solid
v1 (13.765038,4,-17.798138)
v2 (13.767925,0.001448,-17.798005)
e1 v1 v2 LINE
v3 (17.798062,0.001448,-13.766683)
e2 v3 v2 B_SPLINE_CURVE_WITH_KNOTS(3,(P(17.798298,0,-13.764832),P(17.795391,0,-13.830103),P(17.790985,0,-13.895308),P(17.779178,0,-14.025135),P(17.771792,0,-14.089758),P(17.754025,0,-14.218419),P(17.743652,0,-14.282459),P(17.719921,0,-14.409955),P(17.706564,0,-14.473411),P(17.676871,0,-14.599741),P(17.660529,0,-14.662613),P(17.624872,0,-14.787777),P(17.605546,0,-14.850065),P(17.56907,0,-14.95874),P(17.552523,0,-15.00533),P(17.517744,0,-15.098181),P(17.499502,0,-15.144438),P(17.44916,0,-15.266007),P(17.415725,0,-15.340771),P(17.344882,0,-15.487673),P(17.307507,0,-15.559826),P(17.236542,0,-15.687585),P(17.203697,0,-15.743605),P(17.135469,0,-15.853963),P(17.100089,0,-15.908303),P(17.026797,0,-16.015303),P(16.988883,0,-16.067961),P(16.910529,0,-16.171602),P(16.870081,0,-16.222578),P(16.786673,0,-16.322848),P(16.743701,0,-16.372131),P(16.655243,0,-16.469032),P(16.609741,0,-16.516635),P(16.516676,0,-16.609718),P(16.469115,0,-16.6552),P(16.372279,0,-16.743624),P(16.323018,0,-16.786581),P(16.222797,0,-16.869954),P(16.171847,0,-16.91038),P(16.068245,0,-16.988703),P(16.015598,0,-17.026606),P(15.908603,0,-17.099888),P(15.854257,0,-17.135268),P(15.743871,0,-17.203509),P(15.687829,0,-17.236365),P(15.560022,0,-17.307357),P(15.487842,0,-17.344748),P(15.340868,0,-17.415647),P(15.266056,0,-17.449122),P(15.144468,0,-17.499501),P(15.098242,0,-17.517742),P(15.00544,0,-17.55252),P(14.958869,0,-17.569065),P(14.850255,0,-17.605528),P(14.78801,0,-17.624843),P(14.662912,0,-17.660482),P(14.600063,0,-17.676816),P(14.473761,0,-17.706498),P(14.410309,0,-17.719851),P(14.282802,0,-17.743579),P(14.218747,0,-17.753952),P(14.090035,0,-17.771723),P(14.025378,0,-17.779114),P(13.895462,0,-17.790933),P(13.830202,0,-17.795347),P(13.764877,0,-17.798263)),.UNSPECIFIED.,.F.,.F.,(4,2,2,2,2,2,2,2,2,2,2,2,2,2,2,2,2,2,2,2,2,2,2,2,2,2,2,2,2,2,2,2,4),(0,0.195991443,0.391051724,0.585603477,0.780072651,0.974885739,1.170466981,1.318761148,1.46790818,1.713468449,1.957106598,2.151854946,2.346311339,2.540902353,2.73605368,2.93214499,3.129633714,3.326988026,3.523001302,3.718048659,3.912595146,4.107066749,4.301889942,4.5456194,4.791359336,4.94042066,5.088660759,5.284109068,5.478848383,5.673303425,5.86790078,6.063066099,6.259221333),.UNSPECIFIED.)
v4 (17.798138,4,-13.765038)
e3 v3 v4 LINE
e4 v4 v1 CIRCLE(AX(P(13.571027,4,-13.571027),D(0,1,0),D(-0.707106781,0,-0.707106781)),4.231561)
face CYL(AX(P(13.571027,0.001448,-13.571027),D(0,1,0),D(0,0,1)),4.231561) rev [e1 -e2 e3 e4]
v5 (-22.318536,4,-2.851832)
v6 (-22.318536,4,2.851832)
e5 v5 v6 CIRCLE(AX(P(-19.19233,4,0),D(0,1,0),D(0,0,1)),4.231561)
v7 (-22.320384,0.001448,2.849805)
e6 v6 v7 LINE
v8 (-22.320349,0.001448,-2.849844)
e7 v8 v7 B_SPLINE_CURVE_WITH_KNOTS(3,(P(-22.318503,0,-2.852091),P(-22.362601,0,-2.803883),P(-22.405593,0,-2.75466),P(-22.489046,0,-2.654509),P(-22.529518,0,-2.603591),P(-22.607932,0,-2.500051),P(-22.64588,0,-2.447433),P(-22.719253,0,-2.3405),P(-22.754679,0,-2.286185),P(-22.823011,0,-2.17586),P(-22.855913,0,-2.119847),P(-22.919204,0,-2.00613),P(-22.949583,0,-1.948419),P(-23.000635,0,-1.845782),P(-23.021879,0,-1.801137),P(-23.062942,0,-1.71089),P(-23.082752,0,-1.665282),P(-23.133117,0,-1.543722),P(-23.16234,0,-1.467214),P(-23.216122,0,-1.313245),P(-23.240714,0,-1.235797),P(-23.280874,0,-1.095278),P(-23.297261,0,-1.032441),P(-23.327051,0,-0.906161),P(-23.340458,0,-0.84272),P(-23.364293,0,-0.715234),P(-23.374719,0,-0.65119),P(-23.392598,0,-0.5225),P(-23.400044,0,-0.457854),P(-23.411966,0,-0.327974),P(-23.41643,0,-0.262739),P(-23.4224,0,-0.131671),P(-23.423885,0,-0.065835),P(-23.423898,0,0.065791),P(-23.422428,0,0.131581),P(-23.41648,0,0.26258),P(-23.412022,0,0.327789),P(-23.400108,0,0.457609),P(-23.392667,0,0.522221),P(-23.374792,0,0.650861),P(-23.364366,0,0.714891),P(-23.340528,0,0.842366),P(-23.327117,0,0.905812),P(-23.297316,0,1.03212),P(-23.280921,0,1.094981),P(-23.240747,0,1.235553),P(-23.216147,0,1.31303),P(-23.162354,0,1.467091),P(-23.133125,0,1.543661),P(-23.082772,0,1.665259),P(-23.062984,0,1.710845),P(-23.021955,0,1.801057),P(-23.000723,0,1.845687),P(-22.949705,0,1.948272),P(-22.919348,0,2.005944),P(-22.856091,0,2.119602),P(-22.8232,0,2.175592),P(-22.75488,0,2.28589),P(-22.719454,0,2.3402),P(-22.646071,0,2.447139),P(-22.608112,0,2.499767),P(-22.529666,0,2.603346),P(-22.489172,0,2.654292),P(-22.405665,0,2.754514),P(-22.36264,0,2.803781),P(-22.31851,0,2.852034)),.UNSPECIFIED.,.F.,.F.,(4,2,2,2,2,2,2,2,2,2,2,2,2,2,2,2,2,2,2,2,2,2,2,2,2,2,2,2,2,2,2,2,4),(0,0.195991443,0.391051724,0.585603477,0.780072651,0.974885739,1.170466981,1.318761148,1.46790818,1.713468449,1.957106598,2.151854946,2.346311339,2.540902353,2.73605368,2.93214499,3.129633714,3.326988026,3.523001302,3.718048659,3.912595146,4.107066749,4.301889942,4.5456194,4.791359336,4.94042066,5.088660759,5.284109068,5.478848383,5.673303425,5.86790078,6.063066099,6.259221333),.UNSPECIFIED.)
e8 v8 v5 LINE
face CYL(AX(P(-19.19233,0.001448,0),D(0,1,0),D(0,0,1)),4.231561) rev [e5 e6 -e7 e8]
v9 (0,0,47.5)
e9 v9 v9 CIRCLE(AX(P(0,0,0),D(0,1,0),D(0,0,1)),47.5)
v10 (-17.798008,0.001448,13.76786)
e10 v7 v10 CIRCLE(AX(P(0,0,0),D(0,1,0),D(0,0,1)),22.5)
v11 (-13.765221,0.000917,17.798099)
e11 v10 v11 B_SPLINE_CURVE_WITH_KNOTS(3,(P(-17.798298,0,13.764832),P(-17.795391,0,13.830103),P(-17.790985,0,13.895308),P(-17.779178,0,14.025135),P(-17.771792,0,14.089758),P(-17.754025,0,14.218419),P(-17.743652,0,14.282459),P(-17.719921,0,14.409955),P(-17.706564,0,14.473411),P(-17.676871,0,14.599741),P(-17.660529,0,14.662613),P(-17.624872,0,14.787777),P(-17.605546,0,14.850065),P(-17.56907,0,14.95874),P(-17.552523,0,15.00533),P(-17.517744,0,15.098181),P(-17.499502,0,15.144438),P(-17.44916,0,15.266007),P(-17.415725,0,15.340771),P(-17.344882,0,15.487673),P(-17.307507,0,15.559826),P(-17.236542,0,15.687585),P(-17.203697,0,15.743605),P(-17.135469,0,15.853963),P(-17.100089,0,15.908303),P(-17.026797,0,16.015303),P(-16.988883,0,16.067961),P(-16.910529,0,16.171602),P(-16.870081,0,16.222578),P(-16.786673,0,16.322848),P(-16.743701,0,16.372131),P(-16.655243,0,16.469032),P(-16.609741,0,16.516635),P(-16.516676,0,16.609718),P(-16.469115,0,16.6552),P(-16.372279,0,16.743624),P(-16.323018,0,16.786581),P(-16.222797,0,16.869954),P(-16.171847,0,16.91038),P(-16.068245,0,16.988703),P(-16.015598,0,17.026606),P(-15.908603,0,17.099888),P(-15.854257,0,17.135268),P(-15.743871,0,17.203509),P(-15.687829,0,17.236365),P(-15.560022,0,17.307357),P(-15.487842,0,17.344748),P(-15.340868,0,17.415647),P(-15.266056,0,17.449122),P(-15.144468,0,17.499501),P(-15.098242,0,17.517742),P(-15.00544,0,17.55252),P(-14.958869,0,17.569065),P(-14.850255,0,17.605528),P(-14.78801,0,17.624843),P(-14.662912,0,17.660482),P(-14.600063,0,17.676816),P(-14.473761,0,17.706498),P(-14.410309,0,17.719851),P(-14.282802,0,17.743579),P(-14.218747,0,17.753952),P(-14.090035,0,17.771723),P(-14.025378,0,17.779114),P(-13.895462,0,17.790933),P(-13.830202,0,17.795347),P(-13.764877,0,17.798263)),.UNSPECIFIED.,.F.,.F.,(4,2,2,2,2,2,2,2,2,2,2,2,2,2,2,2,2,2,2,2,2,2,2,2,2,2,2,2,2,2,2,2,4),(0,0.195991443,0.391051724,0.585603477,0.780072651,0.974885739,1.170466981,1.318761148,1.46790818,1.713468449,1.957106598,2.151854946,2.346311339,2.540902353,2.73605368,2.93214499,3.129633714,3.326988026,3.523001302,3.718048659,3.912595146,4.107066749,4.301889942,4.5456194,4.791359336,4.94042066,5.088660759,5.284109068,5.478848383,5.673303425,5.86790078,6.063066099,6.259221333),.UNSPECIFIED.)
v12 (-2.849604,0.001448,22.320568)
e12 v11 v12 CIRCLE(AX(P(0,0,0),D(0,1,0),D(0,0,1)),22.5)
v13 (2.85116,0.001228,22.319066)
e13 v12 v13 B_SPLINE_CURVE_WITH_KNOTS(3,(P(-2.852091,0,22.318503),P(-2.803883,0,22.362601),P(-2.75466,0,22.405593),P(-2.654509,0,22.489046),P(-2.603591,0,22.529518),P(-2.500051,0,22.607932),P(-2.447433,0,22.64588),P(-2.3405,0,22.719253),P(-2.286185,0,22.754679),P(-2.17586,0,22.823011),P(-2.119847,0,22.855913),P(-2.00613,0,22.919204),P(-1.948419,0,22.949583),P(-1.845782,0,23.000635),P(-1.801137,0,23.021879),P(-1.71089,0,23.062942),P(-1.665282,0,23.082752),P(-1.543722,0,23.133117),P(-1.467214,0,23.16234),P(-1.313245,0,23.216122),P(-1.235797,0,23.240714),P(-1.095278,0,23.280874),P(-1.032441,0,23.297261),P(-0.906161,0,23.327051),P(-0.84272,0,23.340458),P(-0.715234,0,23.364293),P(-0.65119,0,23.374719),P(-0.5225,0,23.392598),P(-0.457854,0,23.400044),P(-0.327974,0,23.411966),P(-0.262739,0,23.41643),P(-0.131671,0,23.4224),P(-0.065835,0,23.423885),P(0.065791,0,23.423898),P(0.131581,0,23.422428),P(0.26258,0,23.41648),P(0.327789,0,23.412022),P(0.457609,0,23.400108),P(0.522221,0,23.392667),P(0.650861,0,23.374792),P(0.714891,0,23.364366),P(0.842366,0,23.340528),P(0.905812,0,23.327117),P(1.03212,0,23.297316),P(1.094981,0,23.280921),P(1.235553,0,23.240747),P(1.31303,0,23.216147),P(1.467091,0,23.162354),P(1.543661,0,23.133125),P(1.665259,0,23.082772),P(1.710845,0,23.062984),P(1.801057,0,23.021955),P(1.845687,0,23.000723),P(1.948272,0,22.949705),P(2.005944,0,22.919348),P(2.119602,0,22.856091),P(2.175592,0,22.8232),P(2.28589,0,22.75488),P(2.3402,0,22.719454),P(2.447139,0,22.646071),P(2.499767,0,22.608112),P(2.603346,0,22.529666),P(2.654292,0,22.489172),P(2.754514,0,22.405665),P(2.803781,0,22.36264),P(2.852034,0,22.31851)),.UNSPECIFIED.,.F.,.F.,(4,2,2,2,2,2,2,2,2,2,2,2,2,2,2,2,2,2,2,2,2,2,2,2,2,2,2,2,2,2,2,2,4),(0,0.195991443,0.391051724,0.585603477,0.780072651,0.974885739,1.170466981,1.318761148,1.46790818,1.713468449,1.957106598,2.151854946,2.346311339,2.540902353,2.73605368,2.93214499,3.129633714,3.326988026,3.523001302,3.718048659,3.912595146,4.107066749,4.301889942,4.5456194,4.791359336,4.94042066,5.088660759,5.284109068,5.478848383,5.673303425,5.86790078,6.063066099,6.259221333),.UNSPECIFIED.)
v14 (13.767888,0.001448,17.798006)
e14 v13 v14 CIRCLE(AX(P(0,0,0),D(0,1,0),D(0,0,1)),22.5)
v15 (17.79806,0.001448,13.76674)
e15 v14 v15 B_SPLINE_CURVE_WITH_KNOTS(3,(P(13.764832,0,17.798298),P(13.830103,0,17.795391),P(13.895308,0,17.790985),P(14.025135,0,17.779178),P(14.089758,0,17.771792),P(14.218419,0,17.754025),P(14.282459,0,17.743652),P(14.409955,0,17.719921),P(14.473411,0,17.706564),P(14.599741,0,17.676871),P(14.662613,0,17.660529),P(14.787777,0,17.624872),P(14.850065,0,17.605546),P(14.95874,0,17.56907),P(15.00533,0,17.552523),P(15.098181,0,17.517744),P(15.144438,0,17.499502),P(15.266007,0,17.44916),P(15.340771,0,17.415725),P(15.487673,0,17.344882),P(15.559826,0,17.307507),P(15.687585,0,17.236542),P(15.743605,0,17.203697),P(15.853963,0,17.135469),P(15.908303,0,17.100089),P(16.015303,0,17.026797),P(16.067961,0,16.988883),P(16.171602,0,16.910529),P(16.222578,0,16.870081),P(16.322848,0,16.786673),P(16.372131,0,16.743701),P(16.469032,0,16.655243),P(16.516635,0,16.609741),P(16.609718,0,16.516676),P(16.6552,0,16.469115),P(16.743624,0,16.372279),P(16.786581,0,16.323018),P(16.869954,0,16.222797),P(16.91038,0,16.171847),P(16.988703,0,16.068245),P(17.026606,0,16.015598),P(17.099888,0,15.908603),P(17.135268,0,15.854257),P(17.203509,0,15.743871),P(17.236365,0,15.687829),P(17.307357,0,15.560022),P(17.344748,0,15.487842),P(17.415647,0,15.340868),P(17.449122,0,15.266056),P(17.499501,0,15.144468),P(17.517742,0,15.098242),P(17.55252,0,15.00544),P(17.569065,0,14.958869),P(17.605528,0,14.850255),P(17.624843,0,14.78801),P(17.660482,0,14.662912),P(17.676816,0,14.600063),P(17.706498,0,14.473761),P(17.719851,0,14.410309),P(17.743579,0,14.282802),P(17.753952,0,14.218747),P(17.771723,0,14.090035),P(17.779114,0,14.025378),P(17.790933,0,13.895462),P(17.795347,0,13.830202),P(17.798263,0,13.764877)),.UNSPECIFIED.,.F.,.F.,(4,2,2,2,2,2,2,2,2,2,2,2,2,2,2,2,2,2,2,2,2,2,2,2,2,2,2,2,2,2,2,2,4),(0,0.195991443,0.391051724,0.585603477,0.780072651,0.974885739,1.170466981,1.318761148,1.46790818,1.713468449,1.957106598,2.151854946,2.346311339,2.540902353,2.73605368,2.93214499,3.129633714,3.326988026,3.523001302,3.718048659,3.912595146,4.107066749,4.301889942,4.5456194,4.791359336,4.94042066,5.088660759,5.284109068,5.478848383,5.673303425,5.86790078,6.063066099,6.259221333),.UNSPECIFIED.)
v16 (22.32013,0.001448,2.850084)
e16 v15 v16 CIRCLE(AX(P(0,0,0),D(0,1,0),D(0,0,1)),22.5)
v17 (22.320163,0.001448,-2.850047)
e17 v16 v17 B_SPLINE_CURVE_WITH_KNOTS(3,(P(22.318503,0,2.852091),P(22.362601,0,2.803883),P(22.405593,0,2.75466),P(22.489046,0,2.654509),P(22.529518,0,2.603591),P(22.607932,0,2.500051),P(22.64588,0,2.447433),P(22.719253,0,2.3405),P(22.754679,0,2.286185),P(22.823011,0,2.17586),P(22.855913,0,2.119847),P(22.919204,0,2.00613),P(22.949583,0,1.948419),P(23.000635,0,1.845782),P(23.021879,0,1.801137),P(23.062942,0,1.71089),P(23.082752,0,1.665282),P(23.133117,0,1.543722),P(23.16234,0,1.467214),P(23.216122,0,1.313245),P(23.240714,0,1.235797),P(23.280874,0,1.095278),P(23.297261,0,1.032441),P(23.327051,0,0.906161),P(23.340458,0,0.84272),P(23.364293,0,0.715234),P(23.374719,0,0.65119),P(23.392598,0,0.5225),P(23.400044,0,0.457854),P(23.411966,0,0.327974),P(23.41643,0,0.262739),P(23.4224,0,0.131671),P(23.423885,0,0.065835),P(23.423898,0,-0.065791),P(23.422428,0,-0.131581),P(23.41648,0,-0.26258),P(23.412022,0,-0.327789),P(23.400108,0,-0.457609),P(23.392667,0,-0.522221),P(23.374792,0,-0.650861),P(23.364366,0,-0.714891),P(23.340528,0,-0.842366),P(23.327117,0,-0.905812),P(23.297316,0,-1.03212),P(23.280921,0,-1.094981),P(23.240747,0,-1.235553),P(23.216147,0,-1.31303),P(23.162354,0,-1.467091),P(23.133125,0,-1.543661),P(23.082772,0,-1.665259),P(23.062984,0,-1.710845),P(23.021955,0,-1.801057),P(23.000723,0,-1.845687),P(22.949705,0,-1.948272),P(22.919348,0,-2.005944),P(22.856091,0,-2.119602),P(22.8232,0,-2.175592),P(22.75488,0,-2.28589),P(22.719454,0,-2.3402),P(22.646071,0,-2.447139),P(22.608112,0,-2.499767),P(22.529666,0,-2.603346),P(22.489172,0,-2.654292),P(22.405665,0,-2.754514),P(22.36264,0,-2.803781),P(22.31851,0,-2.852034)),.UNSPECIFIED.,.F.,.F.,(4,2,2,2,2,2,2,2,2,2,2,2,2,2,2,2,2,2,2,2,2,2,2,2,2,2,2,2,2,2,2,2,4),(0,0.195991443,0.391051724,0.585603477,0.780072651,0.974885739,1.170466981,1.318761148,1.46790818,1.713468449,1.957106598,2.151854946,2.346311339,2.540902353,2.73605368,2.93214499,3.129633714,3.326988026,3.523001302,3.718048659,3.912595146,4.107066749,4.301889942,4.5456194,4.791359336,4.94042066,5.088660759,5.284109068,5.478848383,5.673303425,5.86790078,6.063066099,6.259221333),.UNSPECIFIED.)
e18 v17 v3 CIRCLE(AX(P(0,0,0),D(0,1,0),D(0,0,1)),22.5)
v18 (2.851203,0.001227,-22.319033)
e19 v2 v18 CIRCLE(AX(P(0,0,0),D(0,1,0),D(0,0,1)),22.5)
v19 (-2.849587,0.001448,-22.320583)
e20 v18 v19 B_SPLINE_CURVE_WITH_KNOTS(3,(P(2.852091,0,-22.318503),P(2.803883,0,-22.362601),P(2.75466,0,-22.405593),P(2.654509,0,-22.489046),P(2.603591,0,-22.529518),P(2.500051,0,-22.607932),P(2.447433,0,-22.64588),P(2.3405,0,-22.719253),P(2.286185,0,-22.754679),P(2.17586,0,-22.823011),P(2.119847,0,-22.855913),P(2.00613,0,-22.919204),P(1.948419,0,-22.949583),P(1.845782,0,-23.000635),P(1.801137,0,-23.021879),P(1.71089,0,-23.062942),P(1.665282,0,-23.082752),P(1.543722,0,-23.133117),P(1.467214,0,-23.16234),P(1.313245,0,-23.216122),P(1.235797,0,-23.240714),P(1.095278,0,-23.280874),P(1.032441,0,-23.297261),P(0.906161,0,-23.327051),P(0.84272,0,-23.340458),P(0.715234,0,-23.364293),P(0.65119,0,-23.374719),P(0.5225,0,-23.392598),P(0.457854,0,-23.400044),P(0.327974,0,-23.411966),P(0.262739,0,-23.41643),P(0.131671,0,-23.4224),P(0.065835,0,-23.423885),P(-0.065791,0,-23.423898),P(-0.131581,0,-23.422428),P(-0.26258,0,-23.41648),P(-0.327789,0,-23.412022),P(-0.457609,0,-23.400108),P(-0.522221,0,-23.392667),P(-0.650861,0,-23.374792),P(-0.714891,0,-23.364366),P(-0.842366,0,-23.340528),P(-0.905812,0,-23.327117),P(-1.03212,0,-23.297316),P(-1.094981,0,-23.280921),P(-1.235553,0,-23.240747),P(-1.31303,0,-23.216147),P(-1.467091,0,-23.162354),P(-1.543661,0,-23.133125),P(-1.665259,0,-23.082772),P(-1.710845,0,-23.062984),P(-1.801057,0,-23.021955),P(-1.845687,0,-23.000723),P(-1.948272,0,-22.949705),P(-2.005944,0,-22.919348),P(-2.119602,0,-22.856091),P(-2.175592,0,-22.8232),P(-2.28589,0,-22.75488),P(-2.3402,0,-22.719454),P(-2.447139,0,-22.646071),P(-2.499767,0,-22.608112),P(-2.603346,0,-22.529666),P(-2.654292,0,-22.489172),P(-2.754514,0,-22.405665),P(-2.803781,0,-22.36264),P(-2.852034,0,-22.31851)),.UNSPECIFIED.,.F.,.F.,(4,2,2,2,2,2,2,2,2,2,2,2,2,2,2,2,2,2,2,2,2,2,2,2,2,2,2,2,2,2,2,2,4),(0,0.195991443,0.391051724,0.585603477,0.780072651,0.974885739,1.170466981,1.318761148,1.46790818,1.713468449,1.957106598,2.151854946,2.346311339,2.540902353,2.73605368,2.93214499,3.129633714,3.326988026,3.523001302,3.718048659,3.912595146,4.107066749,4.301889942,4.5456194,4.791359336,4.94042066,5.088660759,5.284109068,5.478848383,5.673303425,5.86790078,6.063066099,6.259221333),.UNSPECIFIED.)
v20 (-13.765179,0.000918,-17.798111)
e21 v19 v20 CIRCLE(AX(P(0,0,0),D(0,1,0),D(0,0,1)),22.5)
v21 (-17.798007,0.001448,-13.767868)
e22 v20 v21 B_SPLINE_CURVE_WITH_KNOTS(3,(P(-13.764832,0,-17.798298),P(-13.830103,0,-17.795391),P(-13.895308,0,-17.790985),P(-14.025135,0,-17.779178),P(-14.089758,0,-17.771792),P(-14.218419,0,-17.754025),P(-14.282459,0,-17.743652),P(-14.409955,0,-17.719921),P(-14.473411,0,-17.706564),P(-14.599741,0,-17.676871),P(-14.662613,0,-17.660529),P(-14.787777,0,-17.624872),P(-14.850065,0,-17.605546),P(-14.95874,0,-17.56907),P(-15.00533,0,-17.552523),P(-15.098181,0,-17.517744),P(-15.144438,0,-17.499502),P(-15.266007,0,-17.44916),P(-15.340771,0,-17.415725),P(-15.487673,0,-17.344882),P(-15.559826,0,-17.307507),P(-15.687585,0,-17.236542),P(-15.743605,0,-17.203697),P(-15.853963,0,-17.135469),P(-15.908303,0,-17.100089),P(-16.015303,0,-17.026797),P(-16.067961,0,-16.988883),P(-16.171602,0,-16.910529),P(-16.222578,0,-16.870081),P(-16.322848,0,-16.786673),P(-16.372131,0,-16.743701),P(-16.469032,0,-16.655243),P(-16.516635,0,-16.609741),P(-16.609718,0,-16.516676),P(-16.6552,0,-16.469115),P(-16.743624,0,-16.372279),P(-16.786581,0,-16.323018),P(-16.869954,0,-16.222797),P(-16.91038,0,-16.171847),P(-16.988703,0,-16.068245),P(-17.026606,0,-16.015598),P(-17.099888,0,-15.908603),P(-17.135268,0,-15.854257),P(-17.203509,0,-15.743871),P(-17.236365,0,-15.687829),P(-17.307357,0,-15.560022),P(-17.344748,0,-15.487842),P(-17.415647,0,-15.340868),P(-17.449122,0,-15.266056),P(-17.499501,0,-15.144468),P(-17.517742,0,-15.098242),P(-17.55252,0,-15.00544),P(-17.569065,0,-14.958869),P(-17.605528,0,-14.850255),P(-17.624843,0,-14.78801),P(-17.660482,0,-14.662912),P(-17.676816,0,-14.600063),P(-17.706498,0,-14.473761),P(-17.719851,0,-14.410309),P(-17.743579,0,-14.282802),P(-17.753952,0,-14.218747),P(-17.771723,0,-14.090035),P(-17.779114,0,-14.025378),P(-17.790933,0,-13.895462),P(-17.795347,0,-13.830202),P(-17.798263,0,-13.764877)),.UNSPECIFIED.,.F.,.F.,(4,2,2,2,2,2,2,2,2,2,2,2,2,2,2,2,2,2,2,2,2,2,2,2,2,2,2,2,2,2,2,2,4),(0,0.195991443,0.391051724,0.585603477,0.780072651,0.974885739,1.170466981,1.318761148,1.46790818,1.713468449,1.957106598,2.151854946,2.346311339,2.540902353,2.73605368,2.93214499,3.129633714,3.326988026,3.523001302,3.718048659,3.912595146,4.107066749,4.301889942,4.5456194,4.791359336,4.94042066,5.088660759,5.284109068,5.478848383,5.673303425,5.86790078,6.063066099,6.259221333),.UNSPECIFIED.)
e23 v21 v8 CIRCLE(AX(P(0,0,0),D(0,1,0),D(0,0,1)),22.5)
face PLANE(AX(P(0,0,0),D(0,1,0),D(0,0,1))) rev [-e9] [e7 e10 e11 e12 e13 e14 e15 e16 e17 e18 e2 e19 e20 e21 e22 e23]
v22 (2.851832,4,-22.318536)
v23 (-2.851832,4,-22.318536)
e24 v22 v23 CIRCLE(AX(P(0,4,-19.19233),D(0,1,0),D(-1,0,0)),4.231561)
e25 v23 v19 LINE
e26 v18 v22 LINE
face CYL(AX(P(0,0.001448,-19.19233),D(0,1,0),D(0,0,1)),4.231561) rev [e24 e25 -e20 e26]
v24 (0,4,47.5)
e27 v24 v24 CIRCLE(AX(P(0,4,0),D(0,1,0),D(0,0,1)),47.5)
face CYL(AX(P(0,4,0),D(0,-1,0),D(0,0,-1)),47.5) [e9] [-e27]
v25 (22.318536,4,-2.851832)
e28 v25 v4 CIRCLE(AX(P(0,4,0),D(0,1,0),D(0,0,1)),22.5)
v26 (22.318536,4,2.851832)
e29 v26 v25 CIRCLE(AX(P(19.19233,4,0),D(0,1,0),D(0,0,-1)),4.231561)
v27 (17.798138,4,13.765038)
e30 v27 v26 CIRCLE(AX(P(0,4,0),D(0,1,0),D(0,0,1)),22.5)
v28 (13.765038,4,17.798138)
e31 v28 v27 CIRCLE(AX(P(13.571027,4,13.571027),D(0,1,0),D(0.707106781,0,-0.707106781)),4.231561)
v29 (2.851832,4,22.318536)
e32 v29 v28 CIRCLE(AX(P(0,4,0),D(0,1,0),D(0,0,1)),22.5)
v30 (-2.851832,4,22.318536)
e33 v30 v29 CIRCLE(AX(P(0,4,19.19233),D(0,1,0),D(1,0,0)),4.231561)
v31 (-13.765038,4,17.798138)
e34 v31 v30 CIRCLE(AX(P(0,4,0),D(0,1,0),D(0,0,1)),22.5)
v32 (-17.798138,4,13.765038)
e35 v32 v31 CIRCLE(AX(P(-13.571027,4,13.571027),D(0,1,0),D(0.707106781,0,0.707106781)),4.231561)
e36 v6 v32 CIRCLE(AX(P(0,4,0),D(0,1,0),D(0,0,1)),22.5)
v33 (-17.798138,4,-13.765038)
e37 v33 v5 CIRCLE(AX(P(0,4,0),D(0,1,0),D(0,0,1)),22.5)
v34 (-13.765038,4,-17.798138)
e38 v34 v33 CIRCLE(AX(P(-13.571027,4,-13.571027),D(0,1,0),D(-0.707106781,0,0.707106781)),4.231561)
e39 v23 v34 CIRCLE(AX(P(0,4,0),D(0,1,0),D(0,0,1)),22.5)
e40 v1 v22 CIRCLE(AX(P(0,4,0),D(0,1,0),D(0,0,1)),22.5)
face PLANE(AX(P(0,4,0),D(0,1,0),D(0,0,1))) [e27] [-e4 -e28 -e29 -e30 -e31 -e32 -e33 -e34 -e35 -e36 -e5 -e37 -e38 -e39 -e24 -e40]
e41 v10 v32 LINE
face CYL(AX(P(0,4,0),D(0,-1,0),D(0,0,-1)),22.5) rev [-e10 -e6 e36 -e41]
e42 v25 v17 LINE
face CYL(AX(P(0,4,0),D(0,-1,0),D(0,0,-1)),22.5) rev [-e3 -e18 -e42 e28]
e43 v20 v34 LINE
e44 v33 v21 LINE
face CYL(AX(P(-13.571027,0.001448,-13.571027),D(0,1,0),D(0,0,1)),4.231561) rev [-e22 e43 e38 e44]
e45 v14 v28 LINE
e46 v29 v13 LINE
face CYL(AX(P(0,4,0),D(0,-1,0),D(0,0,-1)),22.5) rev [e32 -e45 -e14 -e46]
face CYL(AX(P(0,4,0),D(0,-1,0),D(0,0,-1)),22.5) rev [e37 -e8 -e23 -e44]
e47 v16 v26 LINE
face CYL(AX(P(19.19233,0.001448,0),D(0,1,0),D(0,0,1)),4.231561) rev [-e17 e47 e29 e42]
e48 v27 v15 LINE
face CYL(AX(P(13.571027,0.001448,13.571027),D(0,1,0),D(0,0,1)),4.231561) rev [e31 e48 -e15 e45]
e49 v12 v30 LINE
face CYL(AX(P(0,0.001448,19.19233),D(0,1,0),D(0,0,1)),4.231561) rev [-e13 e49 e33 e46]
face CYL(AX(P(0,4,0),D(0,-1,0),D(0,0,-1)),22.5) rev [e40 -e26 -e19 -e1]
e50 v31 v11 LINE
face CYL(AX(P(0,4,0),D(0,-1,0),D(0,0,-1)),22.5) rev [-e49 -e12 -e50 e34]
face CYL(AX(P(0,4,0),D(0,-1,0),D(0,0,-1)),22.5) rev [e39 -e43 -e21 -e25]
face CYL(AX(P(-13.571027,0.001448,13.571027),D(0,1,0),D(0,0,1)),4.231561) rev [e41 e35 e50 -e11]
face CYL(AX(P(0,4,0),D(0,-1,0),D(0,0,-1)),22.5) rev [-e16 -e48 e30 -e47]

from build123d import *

# Parameters (mm, degrees)
SKETCH1_R           = 47.5
BOSS_EXTRUDE1_DEPTH = 4
SKETCH2_R           = 22.5
CUT_EXTRUDE1_DEPTH  = 68.294130502
SKETCH3_R           = 4.231561453
CUT_EXTRUDE2_DEPTH  = 4
CIRPATTERN1_DEPTH   = 4


# Read off the part's stored shape, not the designer's step: CirPattern1
with BuildPart() as part:
    # Sketch1 → Boss-Extrude1 (new body)
    with BuildSketch(Plane(origin=(0, 0, 0), x_dir=(1, 0, 0), z_dir=(0, 1, 0))):
        with Locations(Location((0, 0, 0), (0, 0, 270))):
            Circle(SKETCH1_R)
    extrude(amount=BOSS_EXTRUDE1_DEPTH)

    # Sketch2 → Cut-Extrude1 (cut, through all)
    with BuildSketch(Plane(origin=(0, 0, 0), x_dir=(1, 0, 0), z_dir=(0, 1, 0))):
        with Locations(Location((0, 0, 0), (0, 0, 270))):
            Circle(SKETCH2_R)
    extrude(amount=CUT_EXTRUDE1_DEPTH, mode=Mode.SUBTRACT)

    # Sketch3 → Cut-Extrude2 (cut)
    with BuildSketch(Plane(origin=(0, 4, 0), x_dir=(1, 0, 0), z_dir=(0, 1, 0))):
        with Locations((-19.192330033, 0)):
            Circle(SKETCH3_R)
    extrude(amount=-CUT_EXTRUDE2_DEPTH, mode=Mode.SUBTRACT)

    # CirPattern1 outline → CirPattern1 (cut)
    with BuildSketch(Plane(origin=(0, 0, 0), x_dir=(1, 0, 0), z_dir=(0, 1, 0))):
        with BuildLine():
            ThreePointArc((-13.765038141, -17.798138245), (-15.909902577, -15.909902577), (-17.798138245, -13.765038141))
            ThreePointArc((-17.798138245, -13.765038141), (-16.563192512, -16.563192512), (-13.765038141, -17.798138245))
        make_face()
        with BuildLine():
            ThreePointArc((-17.798138245, 13.765038141), (-15.909902577, 15.909902577), (-13.765038141, 17.798138245))
            ThreePointArc((-13.765038141, 17.798138245), (-16.563192512, 16.563192512), (-17.798138245, 13.765038141))
        make_face()
        with BuildLine():
            ThreePointArc((-2.851832433, 22.318536059), (0, 22.500000001), (2.851832433, 22.318536059))
            ThreePointArc((2.851832433, 22.318536059), (0, 23.423891487), (-2.851832433, 22.318536059))
        make_face()
        with BuildLine():
            ThreePointArc((13.765038141, 17.798138245), (15.909902577, 15.909902577), (17.798138245, 13.765038141))
            ThreePointArc((17.798138245, 13.765038141), (16.563192512, 16.563192512), (13.765038141, 17.798138245))
        make_face()
        with BuildLine():
            ThreePointArc((22.318536058, 2.851832433), (22.5, 0), (22.318536058, -2.851832433))
            ThreePointArc((22.318536058, -2.851832433), (23.423891487, 0), (22.318536058, 2.851832433))
        make_face()
        with BuildLine():
            ThreePointArc((17.798138245, -13.765038141), (15.909902576, -15.909902576), (13.765038141, -17.798138244))
            ThreePointArc((13.765038141, -17.798138244), (16.563192512, -16.563192512), (17.798138245, -13.765038141))
        make_face()
        with BuildLine():
            ThreePointArc((2.851832433, -22.318536058), (0, -22.499999999), (-2.851832433, -22.318536058))
            ThreePointArc((-2.851832433, -22.318536058), (0, -23.423891487), (2.851832433, -22.318536058))
        make_face()
    extrude(amount=CIRPATTERN1_DEPTH, mode=Mode.SUBTRACT)


solid = part.part
